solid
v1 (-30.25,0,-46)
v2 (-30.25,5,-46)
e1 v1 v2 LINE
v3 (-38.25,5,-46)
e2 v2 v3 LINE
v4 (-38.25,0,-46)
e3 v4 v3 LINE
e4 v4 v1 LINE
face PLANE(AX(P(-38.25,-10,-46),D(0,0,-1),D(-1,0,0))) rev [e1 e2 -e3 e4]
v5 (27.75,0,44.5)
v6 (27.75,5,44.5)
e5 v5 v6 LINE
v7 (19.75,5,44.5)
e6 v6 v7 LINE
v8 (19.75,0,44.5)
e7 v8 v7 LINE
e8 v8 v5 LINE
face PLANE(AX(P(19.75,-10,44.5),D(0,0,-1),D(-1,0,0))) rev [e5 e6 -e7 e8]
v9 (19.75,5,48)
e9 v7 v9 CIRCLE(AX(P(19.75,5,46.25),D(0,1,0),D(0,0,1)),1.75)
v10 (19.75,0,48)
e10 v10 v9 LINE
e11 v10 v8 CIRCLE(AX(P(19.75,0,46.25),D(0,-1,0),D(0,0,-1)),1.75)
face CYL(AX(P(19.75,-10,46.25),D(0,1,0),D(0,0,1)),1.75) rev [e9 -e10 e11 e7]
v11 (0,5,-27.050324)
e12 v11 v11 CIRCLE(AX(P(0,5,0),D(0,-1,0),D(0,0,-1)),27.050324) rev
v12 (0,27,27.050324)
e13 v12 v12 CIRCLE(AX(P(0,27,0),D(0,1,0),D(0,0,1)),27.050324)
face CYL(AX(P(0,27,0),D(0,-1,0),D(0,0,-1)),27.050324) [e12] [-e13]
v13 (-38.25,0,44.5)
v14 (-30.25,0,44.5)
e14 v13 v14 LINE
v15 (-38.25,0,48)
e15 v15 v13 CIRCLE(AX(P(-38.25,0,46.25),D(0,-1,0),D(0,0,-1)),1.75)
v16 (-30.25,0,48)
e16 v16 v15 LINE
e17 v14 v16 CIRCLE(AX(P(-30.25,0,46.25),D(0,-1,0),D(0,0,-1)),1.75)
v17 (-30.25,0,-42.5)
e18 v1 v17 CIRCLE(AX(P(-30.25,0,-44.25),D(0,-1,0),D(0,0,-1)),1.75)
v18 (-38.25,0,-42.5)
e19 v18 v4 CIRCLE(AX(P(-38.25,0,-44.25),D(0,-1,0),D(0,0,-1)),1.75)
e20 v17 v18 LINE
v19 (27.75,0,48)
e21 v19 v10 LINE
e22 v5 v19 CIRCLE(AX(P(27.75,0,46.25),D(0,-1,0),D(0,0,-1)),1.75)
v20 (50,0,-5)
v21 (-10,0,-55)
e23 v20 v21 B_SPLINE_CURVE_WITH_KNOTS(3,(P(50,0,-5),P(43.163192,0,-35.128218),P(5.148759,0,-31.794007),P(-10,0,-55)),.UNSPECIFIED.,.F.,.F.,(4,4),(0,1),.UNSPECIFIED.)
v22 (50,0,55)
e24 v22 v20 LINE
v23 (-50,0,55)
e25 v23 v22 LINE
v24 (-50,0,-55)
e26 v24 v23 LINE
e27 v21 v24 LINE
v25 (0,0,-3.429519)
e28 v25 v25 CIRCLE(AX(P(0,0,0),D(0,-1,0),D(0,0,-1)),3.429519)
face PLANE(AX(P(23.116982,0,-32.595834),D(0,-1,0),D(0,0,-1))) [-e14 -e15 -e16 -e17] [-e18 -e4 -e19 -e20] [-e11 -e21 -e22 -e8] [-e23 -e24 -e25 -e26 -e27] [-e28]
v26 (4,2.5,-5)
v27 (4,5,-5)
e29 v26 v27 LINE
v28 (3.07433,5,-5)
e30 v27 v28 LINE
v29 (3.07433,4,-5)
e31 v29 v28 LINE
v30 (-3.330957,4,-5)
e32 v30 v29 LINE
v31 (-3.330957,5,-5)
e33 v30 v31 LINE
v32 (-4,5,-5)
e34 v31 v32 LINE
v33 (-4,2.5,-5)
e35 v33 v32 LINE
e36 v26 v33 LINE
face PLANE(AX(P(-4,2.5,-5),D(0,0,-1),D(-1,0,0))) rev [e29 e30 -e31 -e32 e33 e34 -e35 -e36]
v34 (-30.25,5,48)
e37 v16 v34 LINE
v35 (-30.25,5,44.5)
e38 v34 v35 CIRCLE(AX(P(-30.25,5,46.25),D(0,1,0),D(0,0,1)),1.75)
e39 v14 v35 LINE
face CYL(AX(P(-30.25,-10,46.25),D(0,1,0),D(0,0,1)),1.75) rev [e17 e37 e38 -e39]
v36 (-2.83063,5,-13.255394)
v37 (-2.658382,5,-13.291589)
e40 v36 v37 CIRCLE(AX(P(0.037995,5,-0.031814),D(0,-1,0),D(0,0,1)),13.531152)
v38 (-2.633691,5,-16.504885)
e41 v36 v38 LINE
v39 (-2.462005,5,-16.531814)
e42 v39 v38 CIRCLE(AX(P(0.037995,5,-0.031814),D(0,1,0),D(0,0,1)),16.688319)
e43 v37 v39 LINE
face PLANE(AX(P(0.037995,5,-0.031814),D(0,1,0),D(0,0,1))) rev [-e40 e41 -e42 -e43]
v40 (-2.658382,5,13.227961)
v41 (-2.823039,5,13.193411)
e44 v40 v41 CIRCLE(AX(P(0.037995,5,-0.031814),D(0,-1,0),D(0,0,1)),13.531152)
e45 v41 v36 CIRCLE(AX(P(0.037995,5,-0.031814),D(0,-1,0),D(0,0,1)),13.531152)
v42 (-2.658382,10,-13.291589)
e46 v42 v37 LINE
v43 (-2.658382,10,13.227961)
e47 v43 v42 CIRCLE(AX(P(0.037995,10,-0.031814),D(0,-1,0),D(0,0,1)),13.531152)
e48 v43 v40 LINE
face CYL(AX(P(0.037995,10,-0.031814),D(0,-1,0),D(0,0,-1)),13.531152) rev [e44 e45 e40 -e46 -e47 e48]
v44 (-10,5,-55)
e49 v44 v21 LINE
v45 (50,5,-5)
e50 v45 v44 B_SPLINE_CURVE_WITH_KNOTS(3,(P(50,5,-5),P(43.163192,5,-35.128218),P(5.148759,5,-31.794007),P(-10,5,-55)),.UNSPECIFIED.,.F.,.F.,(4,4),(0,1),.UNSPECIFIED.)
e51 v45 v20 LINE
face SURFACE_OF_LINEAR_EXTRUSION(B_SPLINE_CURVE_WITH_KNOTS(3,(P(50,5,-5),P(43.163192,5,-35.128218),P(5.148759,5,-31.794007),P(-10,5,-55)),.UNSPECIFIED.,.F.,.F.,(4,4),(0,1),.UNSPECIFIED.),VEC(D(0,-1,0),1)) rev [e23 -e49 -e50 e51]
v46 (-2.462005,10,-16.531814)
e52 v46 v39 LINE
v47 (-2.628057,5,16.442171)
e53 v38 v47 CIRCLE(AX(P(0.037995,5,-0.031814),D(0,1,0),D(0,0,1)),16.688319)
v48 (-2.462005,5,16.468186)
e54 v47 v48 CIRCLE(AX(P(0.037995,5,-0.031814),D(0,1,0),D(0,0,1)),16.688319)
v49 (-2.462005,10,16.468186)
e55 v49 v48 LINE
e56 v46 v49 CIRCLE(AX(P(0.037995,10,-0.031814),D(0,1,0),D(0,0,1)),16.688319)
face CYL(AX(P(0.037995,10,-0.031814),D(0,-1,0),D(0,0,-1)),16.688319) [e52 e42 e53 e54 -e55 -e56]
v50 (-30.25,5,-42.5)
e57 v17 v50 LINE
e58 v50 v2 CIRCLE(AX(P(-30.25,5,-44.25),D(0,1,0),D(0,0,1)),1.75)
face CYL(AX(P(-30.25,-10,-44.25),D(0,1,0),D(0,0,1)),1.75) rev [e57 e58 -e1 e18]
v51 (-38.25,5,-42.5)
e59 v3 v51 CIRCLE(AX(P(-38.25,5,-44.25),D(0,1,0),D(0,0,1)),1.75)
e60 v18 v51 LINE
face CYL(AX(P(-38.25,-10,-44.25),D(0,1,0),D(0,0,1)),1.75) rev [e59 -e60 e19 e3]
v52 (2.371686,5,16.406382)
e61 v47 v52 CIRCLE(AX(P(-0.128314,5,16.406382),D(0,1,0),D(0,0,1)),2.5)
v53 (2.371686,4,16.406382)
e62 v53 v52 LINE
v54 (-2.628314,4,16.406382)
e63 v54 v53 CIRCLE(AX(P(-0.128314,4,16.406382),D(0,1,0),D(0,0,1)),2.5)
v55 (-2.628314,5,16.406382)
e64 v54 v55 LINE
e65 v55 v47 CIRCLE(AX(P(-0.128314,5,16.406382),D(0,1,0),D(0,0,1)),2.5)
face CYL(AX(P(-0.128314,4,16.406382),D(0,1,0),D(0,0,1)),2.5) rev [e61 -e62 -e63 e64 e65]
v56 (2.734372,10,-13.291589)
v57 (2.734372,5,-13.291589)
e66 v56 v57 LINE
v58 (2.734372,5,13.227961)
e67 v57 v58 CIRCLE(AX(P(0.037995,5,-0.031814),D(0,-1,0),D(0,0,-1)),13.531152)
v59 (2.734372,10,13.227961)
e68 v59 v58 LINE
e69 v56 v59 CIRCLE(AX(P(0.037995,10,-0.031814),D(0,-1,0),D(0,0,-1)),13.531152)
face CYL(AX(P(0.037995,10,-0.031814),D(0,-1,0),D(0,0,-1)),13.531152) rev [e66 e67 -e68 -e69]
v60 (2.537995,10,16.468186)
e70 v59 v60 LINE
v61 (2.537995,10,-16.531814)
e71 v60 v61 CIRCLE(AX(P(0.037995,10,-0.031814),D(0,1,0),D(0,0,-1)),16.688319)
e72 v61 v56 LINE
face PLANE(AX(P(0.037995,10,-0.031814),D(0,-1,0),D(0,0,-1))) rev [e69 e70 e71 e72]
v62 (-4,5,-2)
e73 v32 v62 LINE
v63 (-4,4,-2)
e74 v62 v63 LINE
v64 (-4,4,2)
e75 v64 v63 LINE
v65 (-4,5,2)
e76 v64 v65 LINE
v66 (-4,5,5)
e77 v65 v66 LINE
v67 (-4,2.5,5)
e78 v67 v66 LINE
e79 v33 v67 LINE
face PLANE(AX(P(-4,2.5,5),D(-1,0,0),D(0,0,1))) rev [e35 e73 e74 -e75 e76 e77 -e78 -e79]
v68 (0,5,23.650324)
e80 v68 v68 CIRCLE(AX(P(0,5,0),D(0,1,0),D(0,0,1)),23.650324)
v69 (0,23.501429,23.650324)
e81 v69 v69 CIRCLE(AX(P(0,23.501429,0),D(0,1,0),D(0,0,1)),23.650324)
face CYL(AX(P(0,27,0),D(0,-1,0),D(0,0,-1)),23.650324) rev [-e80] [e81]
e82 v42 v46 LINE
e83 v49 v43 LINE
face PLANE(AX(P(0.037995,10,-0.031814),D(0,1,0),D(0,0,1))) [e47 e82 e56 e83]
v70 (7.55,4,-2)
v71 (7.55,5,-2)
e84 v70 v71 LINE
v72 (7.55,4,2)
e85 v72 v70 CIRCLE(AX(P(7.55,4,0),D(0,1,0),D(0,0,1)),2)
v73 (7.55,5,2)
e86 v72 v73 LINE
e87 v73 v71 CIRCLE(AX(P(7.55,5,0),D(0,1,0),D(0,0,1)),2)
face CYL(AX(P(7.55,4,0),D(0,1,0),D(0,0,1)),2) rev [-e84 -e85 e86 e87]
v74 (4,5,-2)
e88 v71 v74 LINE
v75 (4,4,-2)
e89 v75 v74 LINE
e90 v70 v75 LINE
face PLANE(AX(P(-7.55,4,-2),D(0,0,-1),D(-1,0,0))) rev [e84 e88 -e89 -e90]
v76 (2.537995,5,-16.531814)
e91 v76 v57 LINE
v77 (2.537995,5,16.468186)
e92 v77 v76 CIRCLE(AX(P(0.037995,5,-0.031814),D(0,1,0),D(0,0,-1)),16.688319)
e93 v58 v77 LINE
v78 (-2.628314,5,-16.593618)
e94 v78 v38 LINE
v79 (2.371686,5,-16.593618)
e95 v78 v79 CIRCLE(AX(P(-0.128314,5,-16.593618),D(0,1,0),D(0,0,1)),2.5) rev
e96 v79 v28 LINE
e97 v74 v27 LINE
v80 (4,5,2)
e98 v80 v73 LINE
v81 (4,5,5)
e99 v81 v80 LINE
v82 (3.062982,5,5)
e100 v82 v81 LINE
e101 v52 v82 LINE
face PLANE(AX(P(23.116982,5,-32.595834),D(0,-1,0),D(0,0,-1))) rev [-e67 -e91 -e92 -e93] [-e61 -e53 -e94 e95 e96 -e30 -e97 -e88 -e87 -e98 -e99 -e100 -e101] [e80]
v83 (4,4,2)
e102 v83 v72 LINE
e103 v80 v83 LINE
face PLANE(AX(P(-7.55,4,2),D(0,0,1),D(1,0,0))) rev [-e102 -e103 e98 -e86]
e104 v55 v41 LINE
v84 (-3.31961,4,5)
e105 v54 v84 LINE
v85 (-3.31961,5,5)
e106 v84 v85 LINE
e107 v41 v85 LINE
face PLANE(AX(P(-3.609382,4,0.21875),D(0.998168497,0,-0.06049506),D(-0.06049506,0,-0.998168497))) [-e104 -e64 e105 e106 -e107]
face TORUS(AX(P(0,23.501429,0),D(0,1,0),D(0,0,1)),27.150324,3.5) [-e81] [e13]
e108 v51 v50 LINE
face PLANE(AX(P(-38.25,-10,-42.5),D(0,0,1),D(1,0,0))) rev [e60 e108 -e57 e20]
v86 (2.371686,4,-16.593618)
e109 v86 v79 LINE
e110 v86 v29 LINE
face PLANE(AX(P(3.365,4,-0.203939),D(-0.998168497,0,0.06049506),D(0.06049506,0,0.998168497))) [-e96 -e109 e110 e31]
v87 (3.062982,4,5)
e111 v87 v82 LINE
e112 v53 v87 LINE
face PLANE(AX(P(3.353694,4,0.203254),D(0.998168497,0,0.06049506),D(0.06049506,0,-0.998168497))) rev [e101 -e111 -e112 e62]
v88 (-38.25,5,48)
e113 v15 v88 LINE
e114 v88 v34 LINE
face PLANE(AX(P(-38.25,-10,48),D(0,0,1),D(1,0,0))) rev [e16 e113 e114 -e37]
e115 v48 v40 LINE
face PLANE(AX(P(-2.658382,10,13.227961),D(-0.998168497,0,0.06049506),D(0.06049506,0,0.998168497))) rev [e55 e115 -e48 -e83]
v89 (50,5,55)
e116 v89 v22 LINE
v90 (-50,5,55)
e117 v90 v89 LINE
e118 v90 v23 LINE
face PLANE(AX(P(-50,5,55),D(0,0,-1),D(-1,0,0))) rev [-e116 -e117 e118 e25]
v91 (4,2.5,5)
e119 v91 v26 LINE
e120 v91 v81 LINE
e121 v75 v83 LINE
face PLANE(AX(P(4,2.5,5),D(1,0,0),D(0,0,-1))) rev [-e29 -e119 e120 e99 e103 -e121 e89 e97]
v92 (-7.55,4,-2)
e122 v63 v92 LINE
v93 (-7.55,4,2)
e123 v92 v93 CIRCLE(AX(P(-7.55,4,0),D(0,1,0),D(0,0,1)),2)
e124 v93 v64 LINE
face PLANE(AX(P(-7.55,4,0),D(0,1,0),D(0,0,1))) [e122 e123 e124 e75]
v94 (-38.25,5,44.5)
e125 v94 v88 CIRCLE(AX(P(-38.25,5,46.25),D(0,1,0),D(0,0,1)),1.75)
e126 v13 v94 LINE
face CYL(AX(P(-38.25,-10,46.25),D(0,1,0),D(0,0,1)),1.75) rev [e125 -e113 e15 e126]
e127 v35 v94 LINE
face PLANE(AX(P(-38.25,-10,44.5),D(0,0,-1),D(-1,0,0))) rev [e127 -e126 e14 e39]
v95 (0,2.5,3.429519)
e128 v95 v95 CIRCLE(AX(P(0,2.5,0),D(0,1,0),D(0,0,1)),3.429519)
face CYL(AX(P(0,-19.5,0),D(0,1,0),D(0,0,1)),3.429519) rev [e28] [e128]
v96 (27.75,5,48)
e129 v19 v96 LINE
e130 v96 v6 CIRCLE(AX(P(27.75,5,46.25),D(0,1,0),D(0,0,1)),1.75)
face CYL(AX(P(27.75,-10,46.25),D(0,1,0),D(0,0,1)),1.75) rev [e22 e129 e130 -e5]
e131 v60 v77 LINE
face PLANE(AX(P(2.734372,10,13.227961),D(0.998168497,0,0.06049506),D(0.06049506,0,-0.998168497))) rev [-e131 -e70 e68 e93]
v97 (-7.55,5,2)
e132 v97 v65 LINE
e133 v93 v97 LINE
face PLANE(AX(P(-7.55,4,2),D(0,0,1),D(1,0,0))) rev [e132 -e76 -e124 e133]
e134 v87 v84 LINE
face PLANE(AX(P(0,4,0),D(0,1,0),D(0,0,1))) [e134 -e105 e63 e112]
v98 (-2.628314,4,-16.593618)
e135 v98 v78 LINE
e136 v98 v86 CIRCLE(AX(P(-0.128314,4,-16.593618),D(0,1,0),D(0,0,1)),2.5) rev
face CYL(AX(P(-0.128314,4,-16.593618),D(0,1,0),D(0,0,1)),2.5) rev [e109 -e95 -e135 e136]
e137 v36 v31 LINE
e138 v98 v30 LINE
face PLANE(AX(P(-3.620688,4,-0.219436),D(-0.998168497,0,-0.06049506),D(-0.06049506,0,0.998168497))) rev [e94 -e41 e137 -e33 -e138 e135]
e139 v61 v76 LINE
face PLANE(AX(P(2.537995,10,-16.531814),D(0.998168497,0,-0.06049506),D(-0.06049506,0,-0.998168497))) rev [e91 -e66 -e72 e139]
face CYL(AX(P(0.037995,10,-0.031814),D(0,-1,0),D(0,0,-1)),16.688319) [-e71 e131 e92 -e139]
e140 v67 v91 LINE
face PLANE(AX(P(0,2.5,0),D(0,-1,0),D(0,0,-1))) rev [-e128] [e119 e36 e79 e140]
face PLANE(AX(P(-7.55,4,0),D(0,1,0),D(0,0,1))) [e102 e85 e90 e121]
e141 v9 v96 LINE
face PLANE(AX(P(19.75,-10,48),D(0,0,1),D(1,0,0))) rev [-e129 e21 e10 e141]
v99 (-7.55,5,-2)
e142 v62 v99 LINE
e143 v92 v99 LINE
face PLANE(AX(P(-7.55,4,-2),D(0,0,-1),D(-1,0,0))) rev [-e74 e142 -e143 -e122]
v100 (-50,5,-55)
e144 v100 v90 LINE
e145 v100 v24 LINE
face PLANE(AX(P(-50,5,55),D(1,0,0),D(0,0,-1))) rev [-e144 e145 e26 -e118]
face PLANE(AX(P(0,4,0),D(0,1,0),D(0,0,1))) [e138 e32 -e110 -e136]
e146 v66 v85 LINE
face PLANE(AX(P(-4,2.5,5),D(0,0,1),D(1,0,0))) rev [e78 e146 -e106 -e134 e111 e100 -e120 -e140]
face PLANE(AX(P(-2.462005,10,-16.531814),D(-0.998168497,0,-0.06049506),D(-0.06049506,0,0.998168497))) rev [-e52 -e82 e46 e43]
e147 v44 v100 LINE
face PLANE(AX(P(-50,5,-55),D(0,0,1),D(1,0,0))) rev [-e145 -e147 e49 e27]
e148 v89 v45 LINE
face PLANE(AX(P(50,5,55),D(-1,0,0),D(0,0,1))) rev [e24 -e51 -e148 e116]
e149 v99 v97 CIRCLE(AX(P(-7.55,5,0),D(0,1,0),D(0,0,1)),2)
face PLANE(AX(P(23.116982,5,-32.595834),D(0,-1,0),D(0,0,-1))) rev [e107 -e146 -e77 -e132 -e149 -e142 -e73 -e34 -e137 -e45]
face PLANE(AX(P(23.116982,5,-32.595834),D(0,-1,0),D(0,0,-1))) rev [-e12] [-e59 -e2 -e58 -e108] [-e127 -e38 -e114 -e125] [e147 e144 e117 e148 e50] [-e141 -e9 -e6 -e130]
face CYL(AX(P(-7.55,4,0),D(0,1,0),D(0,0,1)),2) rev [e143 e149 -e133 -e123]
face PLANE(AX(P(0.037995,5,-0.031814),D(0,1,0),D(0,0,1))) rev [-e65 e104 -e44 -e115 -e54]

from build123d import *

# Parameters (mm, degrees)
BOSS_EXTRU_1_DEPTH      = 5
ENL_V_MAT_EXTRU_1_DEPTH = 15
ESQUISSE4_W             = 8
ESQUISSE4_H             = 10
ENL_V_MAT_EXTRU_2_DEPTH = 2.5
ENL_V_MAT_EXTRU_3_DEPTH = 1
ENL_V_MAT_EXTRU_4_DEPTH = 1
BOSS_EXTRU_2_DEPTH      = 5
ESQUISSE9_R             = 27.050324391
ESQUISSE9_R_2           = 23.650324391
BOSS_EXTRU_3_DEPTH      = 22
ESQUISSE10_R            = 3.42951926
ENL_V_MAT_EXTRU_5_DEPTH = 22


with BuildPart() as part:
    # Esquisse1 → Boss.-Extru.1 (new body)
    with BuildSketch(Plane(origin=(0, 0, 0), x_dir=(1, 0, 0), z_dir=(0, 1, 0))):
        with BuildLine():
            Line((-50, 55), (-10, 55))
            add(Edge.make_bspline(
                [(-10, 55), (5.148759318, 31.794007065), (43.163191576, 35.128217793), (50, 5)],
                knots=[0, 0, 0, 0, 1, 1, 1, 1], degree=3))
            Line((50, 5), (50, -55))
            Line((50, -55), (-50, -55))
            Line((-50, -55), (-50, 55))
        make_face()
    extrude(amount=BOSS_EXTRU_1_DEPTH)

    # Esquisse3 → Enlèv. mat.-Extru.1 (cut)
    with BuildSketch(Plane(origin=(0, 5, 0), x_dir=(1, 0, 0), z_dir=(0, 1, 0))):
        with BuildLine():
            Line((-38.25, 46), (-30.25, 46))
            ThreePointArc((-30.25, 46), (-28.5, 44.25), (-30.25, 42.5))
            Line((-30.25, 42.5), (-38.25, 42.5))
            ThreePointArc((-38.25, 42.5), (-40, 44.25), (-38.25, 46))
        make_face()
        with BuildLine():
            Line((-38.25, -44.5), (-30.25, -44.5))
            ThreePointArc((-30.25, -44.5), (-28.5, -46.25), (-30.25, -48))
            Line((-30.25, -48), (-38.25, -48))
            ThreePointArc((-38.25, -48), (-40, -46.25), (-38.25, -44.5))
        make_face()
        with BuildLine():
            Line((19.75, -44.5), (27.75, -44.5))
            ThreePointArc((27.75, -44.5), (29.5, -46.25), (27.75, -48))
            Line((27.75, -48), (19.75, -48))
            ThreePointArc((19.75, -48), (18, -46.25), (19.75, -44.5))
        make_face()
    extrude(amount=-ENL_V_MAT_EXTRU_1_DEPTH, mode=Mode.SUBTRACT)

    # Esquisse4 → Enlèv. mat.-Extru.2 (cut)
    with BuildSketch(Plane(origin=(0, 5, 0), x_dir=(1, 0, 0), z_dir=(0, 1, 0))):
        Rectangle(ESQUISSE4_W, ESQUISSE4_H)
    extrude(amount=-ENL_V_MAT_EXTRU_2_DEPTH, mode=Mode.SUBTRACT)

    # Esquisse6 → Enlèv. mat.-Extru.3 (cut)
    with BuildSketch(Plane(origin=(0, 5, 0), x_dir=(1, 0, 0), z_dir=(0, 1, 0))):
        with BuildLine():
            Line((-2.628313647, 16.593617601), (-3.628313647, 0.093617601))
            Line((-3.628313647, 0.093617601), (-2.628313647, -16.406382399))
            ThreePointArc((-2.628313647, -16.406382399), (-0.128313647, -18.906382399), (2.371686353, -16.406382399))
            Line((2.371686353, -16.406382399), (3.371686353, 0.093617601))
            Line((3.371686353, 0.093617601), (2.371686353, 16.593617601))
            ThreePointArc((2.371686353, 16.593617601), (-0.128313647, 19.093617601), (-2.628313647, 16.593617601))
        make_face()
    extrude(amount=-ENL_V_MAT_EXTRU_3_DEPTH, mode=Mode.SUBTRACT)

    # Esquisse7 → Enlèv. mat.-Extru.4 (cut)
    with BuildSketch(Plane(origin=(0, 5, 0), x_dir=(1, 0, 0), z_dir=(0, 1, 0))):
        with BuildLine():
            Line((-7.55, 2), (7.55, 2))
            ThreePointArc((7.55, 2), (9.55, 0), (7.55, -2))
            Line((7.55, -2), (-7.55, -2))
            ThreePointArc((-7.55, -2), (-9.55, 0), (-7.55, 2))
        make_face()
    extrude(amount=-ENL_V_MAT_EXTRU_4_DEPTH, mode=Mode.SUBTRACT)

    # Esquisse8 → Boss.-Extru.2 (add)
    with BuildSketch(Plane(origin=(0, 5, 0), x_dir=(1, 0, 0), z_dir=(0, 1, 0))):
        with BuildLine():
            Line((-2.462005123, 16.531813588), (-2.658382394, 13.291588605))
            ThreePointArc((-2.658382394, 13.291588605), (-13.493157472, 0.031813588), (-2.658382394, -13.22796143))
            Line((-2.658382394, -13.22796143), (-2.462005123, -16.468186412))
            ThreePointArc((-2.462005123, -16.468186412), (-16.650324391, 0.031813588), (-2.462005123, 16.531813588))
        make_face()
        with BuildLine():
            Line((2.537994877, 16.531813588), (2.734372149, 13.291588605))
            ThreePointArc((2.734372149, 13.291588605), (13.569147227, 0.031813588), (2.734372149, -13.22796143))
            Line((2.734372149, -13.22796143), (2.537994877, -16.468186412))
            ThreePointArc((2.537994877, -16.468186412), (16.726314146, 0.031813588), (2.537994877, 16.531813588))
        make_face()
    extrude(amount=BOSS_EXTRU_2_DEPTH)

    # Esquisse9 → Boss.-Extru.3 (add)
    with BuildSketch(Plane(origin=(0, 5, 0), x_dir=(1, 0, 0), z_dir=(0, 1, 0))):
        with Locations(Location((0, 0, 0), (0, 0, 90))):
            Circle(ESQUISSE9_R)
        with Locations(Location((0, 0, 0), (0, 0, 270))):
            Circle(ESQUISSE9_R_2, mode=Mode.SUBTRACT)
    extrude(amount=BOSS_EXTRU_3_DEPTH)

    # Esquisse10 → Enlèv. mat.-Extru.5 (cut)
    with BuildSketch(Plane(origin=(0, 2.5, 0), x_dir=(1, 0, 0), z_dir=(0, 1, 0))):
        with Locations(Location((0, 0, 0), (0, 0, 270))):
            Circle(ESQUISSE10_R)
    extrude(amount=-ENL_V_MAT_EXTRU_5_DEPTH, mode=Mode.SUBTRACT)

    # Congé1: read off the stored shape, not the designer's step
    # Congé1 outline → Congé1 (revolve, cut)
    with BuildSketch(Plane.XY):
        with BuildLine():
            ThreePointArc((23.650324391, 23.501428863), (24.640344311, 25.940691047), (27.050324391, 27))
            Line((27.050324391, 27), (23.650324391, 27))
            Line((23.650324391, 27), (23.650324391, 23.501428863))
        make_face()
    revolve(axis=Axis((0, 0, 0), (0, 1, 0)), mode=Mode.SUBTRACT)


solid = part.part
